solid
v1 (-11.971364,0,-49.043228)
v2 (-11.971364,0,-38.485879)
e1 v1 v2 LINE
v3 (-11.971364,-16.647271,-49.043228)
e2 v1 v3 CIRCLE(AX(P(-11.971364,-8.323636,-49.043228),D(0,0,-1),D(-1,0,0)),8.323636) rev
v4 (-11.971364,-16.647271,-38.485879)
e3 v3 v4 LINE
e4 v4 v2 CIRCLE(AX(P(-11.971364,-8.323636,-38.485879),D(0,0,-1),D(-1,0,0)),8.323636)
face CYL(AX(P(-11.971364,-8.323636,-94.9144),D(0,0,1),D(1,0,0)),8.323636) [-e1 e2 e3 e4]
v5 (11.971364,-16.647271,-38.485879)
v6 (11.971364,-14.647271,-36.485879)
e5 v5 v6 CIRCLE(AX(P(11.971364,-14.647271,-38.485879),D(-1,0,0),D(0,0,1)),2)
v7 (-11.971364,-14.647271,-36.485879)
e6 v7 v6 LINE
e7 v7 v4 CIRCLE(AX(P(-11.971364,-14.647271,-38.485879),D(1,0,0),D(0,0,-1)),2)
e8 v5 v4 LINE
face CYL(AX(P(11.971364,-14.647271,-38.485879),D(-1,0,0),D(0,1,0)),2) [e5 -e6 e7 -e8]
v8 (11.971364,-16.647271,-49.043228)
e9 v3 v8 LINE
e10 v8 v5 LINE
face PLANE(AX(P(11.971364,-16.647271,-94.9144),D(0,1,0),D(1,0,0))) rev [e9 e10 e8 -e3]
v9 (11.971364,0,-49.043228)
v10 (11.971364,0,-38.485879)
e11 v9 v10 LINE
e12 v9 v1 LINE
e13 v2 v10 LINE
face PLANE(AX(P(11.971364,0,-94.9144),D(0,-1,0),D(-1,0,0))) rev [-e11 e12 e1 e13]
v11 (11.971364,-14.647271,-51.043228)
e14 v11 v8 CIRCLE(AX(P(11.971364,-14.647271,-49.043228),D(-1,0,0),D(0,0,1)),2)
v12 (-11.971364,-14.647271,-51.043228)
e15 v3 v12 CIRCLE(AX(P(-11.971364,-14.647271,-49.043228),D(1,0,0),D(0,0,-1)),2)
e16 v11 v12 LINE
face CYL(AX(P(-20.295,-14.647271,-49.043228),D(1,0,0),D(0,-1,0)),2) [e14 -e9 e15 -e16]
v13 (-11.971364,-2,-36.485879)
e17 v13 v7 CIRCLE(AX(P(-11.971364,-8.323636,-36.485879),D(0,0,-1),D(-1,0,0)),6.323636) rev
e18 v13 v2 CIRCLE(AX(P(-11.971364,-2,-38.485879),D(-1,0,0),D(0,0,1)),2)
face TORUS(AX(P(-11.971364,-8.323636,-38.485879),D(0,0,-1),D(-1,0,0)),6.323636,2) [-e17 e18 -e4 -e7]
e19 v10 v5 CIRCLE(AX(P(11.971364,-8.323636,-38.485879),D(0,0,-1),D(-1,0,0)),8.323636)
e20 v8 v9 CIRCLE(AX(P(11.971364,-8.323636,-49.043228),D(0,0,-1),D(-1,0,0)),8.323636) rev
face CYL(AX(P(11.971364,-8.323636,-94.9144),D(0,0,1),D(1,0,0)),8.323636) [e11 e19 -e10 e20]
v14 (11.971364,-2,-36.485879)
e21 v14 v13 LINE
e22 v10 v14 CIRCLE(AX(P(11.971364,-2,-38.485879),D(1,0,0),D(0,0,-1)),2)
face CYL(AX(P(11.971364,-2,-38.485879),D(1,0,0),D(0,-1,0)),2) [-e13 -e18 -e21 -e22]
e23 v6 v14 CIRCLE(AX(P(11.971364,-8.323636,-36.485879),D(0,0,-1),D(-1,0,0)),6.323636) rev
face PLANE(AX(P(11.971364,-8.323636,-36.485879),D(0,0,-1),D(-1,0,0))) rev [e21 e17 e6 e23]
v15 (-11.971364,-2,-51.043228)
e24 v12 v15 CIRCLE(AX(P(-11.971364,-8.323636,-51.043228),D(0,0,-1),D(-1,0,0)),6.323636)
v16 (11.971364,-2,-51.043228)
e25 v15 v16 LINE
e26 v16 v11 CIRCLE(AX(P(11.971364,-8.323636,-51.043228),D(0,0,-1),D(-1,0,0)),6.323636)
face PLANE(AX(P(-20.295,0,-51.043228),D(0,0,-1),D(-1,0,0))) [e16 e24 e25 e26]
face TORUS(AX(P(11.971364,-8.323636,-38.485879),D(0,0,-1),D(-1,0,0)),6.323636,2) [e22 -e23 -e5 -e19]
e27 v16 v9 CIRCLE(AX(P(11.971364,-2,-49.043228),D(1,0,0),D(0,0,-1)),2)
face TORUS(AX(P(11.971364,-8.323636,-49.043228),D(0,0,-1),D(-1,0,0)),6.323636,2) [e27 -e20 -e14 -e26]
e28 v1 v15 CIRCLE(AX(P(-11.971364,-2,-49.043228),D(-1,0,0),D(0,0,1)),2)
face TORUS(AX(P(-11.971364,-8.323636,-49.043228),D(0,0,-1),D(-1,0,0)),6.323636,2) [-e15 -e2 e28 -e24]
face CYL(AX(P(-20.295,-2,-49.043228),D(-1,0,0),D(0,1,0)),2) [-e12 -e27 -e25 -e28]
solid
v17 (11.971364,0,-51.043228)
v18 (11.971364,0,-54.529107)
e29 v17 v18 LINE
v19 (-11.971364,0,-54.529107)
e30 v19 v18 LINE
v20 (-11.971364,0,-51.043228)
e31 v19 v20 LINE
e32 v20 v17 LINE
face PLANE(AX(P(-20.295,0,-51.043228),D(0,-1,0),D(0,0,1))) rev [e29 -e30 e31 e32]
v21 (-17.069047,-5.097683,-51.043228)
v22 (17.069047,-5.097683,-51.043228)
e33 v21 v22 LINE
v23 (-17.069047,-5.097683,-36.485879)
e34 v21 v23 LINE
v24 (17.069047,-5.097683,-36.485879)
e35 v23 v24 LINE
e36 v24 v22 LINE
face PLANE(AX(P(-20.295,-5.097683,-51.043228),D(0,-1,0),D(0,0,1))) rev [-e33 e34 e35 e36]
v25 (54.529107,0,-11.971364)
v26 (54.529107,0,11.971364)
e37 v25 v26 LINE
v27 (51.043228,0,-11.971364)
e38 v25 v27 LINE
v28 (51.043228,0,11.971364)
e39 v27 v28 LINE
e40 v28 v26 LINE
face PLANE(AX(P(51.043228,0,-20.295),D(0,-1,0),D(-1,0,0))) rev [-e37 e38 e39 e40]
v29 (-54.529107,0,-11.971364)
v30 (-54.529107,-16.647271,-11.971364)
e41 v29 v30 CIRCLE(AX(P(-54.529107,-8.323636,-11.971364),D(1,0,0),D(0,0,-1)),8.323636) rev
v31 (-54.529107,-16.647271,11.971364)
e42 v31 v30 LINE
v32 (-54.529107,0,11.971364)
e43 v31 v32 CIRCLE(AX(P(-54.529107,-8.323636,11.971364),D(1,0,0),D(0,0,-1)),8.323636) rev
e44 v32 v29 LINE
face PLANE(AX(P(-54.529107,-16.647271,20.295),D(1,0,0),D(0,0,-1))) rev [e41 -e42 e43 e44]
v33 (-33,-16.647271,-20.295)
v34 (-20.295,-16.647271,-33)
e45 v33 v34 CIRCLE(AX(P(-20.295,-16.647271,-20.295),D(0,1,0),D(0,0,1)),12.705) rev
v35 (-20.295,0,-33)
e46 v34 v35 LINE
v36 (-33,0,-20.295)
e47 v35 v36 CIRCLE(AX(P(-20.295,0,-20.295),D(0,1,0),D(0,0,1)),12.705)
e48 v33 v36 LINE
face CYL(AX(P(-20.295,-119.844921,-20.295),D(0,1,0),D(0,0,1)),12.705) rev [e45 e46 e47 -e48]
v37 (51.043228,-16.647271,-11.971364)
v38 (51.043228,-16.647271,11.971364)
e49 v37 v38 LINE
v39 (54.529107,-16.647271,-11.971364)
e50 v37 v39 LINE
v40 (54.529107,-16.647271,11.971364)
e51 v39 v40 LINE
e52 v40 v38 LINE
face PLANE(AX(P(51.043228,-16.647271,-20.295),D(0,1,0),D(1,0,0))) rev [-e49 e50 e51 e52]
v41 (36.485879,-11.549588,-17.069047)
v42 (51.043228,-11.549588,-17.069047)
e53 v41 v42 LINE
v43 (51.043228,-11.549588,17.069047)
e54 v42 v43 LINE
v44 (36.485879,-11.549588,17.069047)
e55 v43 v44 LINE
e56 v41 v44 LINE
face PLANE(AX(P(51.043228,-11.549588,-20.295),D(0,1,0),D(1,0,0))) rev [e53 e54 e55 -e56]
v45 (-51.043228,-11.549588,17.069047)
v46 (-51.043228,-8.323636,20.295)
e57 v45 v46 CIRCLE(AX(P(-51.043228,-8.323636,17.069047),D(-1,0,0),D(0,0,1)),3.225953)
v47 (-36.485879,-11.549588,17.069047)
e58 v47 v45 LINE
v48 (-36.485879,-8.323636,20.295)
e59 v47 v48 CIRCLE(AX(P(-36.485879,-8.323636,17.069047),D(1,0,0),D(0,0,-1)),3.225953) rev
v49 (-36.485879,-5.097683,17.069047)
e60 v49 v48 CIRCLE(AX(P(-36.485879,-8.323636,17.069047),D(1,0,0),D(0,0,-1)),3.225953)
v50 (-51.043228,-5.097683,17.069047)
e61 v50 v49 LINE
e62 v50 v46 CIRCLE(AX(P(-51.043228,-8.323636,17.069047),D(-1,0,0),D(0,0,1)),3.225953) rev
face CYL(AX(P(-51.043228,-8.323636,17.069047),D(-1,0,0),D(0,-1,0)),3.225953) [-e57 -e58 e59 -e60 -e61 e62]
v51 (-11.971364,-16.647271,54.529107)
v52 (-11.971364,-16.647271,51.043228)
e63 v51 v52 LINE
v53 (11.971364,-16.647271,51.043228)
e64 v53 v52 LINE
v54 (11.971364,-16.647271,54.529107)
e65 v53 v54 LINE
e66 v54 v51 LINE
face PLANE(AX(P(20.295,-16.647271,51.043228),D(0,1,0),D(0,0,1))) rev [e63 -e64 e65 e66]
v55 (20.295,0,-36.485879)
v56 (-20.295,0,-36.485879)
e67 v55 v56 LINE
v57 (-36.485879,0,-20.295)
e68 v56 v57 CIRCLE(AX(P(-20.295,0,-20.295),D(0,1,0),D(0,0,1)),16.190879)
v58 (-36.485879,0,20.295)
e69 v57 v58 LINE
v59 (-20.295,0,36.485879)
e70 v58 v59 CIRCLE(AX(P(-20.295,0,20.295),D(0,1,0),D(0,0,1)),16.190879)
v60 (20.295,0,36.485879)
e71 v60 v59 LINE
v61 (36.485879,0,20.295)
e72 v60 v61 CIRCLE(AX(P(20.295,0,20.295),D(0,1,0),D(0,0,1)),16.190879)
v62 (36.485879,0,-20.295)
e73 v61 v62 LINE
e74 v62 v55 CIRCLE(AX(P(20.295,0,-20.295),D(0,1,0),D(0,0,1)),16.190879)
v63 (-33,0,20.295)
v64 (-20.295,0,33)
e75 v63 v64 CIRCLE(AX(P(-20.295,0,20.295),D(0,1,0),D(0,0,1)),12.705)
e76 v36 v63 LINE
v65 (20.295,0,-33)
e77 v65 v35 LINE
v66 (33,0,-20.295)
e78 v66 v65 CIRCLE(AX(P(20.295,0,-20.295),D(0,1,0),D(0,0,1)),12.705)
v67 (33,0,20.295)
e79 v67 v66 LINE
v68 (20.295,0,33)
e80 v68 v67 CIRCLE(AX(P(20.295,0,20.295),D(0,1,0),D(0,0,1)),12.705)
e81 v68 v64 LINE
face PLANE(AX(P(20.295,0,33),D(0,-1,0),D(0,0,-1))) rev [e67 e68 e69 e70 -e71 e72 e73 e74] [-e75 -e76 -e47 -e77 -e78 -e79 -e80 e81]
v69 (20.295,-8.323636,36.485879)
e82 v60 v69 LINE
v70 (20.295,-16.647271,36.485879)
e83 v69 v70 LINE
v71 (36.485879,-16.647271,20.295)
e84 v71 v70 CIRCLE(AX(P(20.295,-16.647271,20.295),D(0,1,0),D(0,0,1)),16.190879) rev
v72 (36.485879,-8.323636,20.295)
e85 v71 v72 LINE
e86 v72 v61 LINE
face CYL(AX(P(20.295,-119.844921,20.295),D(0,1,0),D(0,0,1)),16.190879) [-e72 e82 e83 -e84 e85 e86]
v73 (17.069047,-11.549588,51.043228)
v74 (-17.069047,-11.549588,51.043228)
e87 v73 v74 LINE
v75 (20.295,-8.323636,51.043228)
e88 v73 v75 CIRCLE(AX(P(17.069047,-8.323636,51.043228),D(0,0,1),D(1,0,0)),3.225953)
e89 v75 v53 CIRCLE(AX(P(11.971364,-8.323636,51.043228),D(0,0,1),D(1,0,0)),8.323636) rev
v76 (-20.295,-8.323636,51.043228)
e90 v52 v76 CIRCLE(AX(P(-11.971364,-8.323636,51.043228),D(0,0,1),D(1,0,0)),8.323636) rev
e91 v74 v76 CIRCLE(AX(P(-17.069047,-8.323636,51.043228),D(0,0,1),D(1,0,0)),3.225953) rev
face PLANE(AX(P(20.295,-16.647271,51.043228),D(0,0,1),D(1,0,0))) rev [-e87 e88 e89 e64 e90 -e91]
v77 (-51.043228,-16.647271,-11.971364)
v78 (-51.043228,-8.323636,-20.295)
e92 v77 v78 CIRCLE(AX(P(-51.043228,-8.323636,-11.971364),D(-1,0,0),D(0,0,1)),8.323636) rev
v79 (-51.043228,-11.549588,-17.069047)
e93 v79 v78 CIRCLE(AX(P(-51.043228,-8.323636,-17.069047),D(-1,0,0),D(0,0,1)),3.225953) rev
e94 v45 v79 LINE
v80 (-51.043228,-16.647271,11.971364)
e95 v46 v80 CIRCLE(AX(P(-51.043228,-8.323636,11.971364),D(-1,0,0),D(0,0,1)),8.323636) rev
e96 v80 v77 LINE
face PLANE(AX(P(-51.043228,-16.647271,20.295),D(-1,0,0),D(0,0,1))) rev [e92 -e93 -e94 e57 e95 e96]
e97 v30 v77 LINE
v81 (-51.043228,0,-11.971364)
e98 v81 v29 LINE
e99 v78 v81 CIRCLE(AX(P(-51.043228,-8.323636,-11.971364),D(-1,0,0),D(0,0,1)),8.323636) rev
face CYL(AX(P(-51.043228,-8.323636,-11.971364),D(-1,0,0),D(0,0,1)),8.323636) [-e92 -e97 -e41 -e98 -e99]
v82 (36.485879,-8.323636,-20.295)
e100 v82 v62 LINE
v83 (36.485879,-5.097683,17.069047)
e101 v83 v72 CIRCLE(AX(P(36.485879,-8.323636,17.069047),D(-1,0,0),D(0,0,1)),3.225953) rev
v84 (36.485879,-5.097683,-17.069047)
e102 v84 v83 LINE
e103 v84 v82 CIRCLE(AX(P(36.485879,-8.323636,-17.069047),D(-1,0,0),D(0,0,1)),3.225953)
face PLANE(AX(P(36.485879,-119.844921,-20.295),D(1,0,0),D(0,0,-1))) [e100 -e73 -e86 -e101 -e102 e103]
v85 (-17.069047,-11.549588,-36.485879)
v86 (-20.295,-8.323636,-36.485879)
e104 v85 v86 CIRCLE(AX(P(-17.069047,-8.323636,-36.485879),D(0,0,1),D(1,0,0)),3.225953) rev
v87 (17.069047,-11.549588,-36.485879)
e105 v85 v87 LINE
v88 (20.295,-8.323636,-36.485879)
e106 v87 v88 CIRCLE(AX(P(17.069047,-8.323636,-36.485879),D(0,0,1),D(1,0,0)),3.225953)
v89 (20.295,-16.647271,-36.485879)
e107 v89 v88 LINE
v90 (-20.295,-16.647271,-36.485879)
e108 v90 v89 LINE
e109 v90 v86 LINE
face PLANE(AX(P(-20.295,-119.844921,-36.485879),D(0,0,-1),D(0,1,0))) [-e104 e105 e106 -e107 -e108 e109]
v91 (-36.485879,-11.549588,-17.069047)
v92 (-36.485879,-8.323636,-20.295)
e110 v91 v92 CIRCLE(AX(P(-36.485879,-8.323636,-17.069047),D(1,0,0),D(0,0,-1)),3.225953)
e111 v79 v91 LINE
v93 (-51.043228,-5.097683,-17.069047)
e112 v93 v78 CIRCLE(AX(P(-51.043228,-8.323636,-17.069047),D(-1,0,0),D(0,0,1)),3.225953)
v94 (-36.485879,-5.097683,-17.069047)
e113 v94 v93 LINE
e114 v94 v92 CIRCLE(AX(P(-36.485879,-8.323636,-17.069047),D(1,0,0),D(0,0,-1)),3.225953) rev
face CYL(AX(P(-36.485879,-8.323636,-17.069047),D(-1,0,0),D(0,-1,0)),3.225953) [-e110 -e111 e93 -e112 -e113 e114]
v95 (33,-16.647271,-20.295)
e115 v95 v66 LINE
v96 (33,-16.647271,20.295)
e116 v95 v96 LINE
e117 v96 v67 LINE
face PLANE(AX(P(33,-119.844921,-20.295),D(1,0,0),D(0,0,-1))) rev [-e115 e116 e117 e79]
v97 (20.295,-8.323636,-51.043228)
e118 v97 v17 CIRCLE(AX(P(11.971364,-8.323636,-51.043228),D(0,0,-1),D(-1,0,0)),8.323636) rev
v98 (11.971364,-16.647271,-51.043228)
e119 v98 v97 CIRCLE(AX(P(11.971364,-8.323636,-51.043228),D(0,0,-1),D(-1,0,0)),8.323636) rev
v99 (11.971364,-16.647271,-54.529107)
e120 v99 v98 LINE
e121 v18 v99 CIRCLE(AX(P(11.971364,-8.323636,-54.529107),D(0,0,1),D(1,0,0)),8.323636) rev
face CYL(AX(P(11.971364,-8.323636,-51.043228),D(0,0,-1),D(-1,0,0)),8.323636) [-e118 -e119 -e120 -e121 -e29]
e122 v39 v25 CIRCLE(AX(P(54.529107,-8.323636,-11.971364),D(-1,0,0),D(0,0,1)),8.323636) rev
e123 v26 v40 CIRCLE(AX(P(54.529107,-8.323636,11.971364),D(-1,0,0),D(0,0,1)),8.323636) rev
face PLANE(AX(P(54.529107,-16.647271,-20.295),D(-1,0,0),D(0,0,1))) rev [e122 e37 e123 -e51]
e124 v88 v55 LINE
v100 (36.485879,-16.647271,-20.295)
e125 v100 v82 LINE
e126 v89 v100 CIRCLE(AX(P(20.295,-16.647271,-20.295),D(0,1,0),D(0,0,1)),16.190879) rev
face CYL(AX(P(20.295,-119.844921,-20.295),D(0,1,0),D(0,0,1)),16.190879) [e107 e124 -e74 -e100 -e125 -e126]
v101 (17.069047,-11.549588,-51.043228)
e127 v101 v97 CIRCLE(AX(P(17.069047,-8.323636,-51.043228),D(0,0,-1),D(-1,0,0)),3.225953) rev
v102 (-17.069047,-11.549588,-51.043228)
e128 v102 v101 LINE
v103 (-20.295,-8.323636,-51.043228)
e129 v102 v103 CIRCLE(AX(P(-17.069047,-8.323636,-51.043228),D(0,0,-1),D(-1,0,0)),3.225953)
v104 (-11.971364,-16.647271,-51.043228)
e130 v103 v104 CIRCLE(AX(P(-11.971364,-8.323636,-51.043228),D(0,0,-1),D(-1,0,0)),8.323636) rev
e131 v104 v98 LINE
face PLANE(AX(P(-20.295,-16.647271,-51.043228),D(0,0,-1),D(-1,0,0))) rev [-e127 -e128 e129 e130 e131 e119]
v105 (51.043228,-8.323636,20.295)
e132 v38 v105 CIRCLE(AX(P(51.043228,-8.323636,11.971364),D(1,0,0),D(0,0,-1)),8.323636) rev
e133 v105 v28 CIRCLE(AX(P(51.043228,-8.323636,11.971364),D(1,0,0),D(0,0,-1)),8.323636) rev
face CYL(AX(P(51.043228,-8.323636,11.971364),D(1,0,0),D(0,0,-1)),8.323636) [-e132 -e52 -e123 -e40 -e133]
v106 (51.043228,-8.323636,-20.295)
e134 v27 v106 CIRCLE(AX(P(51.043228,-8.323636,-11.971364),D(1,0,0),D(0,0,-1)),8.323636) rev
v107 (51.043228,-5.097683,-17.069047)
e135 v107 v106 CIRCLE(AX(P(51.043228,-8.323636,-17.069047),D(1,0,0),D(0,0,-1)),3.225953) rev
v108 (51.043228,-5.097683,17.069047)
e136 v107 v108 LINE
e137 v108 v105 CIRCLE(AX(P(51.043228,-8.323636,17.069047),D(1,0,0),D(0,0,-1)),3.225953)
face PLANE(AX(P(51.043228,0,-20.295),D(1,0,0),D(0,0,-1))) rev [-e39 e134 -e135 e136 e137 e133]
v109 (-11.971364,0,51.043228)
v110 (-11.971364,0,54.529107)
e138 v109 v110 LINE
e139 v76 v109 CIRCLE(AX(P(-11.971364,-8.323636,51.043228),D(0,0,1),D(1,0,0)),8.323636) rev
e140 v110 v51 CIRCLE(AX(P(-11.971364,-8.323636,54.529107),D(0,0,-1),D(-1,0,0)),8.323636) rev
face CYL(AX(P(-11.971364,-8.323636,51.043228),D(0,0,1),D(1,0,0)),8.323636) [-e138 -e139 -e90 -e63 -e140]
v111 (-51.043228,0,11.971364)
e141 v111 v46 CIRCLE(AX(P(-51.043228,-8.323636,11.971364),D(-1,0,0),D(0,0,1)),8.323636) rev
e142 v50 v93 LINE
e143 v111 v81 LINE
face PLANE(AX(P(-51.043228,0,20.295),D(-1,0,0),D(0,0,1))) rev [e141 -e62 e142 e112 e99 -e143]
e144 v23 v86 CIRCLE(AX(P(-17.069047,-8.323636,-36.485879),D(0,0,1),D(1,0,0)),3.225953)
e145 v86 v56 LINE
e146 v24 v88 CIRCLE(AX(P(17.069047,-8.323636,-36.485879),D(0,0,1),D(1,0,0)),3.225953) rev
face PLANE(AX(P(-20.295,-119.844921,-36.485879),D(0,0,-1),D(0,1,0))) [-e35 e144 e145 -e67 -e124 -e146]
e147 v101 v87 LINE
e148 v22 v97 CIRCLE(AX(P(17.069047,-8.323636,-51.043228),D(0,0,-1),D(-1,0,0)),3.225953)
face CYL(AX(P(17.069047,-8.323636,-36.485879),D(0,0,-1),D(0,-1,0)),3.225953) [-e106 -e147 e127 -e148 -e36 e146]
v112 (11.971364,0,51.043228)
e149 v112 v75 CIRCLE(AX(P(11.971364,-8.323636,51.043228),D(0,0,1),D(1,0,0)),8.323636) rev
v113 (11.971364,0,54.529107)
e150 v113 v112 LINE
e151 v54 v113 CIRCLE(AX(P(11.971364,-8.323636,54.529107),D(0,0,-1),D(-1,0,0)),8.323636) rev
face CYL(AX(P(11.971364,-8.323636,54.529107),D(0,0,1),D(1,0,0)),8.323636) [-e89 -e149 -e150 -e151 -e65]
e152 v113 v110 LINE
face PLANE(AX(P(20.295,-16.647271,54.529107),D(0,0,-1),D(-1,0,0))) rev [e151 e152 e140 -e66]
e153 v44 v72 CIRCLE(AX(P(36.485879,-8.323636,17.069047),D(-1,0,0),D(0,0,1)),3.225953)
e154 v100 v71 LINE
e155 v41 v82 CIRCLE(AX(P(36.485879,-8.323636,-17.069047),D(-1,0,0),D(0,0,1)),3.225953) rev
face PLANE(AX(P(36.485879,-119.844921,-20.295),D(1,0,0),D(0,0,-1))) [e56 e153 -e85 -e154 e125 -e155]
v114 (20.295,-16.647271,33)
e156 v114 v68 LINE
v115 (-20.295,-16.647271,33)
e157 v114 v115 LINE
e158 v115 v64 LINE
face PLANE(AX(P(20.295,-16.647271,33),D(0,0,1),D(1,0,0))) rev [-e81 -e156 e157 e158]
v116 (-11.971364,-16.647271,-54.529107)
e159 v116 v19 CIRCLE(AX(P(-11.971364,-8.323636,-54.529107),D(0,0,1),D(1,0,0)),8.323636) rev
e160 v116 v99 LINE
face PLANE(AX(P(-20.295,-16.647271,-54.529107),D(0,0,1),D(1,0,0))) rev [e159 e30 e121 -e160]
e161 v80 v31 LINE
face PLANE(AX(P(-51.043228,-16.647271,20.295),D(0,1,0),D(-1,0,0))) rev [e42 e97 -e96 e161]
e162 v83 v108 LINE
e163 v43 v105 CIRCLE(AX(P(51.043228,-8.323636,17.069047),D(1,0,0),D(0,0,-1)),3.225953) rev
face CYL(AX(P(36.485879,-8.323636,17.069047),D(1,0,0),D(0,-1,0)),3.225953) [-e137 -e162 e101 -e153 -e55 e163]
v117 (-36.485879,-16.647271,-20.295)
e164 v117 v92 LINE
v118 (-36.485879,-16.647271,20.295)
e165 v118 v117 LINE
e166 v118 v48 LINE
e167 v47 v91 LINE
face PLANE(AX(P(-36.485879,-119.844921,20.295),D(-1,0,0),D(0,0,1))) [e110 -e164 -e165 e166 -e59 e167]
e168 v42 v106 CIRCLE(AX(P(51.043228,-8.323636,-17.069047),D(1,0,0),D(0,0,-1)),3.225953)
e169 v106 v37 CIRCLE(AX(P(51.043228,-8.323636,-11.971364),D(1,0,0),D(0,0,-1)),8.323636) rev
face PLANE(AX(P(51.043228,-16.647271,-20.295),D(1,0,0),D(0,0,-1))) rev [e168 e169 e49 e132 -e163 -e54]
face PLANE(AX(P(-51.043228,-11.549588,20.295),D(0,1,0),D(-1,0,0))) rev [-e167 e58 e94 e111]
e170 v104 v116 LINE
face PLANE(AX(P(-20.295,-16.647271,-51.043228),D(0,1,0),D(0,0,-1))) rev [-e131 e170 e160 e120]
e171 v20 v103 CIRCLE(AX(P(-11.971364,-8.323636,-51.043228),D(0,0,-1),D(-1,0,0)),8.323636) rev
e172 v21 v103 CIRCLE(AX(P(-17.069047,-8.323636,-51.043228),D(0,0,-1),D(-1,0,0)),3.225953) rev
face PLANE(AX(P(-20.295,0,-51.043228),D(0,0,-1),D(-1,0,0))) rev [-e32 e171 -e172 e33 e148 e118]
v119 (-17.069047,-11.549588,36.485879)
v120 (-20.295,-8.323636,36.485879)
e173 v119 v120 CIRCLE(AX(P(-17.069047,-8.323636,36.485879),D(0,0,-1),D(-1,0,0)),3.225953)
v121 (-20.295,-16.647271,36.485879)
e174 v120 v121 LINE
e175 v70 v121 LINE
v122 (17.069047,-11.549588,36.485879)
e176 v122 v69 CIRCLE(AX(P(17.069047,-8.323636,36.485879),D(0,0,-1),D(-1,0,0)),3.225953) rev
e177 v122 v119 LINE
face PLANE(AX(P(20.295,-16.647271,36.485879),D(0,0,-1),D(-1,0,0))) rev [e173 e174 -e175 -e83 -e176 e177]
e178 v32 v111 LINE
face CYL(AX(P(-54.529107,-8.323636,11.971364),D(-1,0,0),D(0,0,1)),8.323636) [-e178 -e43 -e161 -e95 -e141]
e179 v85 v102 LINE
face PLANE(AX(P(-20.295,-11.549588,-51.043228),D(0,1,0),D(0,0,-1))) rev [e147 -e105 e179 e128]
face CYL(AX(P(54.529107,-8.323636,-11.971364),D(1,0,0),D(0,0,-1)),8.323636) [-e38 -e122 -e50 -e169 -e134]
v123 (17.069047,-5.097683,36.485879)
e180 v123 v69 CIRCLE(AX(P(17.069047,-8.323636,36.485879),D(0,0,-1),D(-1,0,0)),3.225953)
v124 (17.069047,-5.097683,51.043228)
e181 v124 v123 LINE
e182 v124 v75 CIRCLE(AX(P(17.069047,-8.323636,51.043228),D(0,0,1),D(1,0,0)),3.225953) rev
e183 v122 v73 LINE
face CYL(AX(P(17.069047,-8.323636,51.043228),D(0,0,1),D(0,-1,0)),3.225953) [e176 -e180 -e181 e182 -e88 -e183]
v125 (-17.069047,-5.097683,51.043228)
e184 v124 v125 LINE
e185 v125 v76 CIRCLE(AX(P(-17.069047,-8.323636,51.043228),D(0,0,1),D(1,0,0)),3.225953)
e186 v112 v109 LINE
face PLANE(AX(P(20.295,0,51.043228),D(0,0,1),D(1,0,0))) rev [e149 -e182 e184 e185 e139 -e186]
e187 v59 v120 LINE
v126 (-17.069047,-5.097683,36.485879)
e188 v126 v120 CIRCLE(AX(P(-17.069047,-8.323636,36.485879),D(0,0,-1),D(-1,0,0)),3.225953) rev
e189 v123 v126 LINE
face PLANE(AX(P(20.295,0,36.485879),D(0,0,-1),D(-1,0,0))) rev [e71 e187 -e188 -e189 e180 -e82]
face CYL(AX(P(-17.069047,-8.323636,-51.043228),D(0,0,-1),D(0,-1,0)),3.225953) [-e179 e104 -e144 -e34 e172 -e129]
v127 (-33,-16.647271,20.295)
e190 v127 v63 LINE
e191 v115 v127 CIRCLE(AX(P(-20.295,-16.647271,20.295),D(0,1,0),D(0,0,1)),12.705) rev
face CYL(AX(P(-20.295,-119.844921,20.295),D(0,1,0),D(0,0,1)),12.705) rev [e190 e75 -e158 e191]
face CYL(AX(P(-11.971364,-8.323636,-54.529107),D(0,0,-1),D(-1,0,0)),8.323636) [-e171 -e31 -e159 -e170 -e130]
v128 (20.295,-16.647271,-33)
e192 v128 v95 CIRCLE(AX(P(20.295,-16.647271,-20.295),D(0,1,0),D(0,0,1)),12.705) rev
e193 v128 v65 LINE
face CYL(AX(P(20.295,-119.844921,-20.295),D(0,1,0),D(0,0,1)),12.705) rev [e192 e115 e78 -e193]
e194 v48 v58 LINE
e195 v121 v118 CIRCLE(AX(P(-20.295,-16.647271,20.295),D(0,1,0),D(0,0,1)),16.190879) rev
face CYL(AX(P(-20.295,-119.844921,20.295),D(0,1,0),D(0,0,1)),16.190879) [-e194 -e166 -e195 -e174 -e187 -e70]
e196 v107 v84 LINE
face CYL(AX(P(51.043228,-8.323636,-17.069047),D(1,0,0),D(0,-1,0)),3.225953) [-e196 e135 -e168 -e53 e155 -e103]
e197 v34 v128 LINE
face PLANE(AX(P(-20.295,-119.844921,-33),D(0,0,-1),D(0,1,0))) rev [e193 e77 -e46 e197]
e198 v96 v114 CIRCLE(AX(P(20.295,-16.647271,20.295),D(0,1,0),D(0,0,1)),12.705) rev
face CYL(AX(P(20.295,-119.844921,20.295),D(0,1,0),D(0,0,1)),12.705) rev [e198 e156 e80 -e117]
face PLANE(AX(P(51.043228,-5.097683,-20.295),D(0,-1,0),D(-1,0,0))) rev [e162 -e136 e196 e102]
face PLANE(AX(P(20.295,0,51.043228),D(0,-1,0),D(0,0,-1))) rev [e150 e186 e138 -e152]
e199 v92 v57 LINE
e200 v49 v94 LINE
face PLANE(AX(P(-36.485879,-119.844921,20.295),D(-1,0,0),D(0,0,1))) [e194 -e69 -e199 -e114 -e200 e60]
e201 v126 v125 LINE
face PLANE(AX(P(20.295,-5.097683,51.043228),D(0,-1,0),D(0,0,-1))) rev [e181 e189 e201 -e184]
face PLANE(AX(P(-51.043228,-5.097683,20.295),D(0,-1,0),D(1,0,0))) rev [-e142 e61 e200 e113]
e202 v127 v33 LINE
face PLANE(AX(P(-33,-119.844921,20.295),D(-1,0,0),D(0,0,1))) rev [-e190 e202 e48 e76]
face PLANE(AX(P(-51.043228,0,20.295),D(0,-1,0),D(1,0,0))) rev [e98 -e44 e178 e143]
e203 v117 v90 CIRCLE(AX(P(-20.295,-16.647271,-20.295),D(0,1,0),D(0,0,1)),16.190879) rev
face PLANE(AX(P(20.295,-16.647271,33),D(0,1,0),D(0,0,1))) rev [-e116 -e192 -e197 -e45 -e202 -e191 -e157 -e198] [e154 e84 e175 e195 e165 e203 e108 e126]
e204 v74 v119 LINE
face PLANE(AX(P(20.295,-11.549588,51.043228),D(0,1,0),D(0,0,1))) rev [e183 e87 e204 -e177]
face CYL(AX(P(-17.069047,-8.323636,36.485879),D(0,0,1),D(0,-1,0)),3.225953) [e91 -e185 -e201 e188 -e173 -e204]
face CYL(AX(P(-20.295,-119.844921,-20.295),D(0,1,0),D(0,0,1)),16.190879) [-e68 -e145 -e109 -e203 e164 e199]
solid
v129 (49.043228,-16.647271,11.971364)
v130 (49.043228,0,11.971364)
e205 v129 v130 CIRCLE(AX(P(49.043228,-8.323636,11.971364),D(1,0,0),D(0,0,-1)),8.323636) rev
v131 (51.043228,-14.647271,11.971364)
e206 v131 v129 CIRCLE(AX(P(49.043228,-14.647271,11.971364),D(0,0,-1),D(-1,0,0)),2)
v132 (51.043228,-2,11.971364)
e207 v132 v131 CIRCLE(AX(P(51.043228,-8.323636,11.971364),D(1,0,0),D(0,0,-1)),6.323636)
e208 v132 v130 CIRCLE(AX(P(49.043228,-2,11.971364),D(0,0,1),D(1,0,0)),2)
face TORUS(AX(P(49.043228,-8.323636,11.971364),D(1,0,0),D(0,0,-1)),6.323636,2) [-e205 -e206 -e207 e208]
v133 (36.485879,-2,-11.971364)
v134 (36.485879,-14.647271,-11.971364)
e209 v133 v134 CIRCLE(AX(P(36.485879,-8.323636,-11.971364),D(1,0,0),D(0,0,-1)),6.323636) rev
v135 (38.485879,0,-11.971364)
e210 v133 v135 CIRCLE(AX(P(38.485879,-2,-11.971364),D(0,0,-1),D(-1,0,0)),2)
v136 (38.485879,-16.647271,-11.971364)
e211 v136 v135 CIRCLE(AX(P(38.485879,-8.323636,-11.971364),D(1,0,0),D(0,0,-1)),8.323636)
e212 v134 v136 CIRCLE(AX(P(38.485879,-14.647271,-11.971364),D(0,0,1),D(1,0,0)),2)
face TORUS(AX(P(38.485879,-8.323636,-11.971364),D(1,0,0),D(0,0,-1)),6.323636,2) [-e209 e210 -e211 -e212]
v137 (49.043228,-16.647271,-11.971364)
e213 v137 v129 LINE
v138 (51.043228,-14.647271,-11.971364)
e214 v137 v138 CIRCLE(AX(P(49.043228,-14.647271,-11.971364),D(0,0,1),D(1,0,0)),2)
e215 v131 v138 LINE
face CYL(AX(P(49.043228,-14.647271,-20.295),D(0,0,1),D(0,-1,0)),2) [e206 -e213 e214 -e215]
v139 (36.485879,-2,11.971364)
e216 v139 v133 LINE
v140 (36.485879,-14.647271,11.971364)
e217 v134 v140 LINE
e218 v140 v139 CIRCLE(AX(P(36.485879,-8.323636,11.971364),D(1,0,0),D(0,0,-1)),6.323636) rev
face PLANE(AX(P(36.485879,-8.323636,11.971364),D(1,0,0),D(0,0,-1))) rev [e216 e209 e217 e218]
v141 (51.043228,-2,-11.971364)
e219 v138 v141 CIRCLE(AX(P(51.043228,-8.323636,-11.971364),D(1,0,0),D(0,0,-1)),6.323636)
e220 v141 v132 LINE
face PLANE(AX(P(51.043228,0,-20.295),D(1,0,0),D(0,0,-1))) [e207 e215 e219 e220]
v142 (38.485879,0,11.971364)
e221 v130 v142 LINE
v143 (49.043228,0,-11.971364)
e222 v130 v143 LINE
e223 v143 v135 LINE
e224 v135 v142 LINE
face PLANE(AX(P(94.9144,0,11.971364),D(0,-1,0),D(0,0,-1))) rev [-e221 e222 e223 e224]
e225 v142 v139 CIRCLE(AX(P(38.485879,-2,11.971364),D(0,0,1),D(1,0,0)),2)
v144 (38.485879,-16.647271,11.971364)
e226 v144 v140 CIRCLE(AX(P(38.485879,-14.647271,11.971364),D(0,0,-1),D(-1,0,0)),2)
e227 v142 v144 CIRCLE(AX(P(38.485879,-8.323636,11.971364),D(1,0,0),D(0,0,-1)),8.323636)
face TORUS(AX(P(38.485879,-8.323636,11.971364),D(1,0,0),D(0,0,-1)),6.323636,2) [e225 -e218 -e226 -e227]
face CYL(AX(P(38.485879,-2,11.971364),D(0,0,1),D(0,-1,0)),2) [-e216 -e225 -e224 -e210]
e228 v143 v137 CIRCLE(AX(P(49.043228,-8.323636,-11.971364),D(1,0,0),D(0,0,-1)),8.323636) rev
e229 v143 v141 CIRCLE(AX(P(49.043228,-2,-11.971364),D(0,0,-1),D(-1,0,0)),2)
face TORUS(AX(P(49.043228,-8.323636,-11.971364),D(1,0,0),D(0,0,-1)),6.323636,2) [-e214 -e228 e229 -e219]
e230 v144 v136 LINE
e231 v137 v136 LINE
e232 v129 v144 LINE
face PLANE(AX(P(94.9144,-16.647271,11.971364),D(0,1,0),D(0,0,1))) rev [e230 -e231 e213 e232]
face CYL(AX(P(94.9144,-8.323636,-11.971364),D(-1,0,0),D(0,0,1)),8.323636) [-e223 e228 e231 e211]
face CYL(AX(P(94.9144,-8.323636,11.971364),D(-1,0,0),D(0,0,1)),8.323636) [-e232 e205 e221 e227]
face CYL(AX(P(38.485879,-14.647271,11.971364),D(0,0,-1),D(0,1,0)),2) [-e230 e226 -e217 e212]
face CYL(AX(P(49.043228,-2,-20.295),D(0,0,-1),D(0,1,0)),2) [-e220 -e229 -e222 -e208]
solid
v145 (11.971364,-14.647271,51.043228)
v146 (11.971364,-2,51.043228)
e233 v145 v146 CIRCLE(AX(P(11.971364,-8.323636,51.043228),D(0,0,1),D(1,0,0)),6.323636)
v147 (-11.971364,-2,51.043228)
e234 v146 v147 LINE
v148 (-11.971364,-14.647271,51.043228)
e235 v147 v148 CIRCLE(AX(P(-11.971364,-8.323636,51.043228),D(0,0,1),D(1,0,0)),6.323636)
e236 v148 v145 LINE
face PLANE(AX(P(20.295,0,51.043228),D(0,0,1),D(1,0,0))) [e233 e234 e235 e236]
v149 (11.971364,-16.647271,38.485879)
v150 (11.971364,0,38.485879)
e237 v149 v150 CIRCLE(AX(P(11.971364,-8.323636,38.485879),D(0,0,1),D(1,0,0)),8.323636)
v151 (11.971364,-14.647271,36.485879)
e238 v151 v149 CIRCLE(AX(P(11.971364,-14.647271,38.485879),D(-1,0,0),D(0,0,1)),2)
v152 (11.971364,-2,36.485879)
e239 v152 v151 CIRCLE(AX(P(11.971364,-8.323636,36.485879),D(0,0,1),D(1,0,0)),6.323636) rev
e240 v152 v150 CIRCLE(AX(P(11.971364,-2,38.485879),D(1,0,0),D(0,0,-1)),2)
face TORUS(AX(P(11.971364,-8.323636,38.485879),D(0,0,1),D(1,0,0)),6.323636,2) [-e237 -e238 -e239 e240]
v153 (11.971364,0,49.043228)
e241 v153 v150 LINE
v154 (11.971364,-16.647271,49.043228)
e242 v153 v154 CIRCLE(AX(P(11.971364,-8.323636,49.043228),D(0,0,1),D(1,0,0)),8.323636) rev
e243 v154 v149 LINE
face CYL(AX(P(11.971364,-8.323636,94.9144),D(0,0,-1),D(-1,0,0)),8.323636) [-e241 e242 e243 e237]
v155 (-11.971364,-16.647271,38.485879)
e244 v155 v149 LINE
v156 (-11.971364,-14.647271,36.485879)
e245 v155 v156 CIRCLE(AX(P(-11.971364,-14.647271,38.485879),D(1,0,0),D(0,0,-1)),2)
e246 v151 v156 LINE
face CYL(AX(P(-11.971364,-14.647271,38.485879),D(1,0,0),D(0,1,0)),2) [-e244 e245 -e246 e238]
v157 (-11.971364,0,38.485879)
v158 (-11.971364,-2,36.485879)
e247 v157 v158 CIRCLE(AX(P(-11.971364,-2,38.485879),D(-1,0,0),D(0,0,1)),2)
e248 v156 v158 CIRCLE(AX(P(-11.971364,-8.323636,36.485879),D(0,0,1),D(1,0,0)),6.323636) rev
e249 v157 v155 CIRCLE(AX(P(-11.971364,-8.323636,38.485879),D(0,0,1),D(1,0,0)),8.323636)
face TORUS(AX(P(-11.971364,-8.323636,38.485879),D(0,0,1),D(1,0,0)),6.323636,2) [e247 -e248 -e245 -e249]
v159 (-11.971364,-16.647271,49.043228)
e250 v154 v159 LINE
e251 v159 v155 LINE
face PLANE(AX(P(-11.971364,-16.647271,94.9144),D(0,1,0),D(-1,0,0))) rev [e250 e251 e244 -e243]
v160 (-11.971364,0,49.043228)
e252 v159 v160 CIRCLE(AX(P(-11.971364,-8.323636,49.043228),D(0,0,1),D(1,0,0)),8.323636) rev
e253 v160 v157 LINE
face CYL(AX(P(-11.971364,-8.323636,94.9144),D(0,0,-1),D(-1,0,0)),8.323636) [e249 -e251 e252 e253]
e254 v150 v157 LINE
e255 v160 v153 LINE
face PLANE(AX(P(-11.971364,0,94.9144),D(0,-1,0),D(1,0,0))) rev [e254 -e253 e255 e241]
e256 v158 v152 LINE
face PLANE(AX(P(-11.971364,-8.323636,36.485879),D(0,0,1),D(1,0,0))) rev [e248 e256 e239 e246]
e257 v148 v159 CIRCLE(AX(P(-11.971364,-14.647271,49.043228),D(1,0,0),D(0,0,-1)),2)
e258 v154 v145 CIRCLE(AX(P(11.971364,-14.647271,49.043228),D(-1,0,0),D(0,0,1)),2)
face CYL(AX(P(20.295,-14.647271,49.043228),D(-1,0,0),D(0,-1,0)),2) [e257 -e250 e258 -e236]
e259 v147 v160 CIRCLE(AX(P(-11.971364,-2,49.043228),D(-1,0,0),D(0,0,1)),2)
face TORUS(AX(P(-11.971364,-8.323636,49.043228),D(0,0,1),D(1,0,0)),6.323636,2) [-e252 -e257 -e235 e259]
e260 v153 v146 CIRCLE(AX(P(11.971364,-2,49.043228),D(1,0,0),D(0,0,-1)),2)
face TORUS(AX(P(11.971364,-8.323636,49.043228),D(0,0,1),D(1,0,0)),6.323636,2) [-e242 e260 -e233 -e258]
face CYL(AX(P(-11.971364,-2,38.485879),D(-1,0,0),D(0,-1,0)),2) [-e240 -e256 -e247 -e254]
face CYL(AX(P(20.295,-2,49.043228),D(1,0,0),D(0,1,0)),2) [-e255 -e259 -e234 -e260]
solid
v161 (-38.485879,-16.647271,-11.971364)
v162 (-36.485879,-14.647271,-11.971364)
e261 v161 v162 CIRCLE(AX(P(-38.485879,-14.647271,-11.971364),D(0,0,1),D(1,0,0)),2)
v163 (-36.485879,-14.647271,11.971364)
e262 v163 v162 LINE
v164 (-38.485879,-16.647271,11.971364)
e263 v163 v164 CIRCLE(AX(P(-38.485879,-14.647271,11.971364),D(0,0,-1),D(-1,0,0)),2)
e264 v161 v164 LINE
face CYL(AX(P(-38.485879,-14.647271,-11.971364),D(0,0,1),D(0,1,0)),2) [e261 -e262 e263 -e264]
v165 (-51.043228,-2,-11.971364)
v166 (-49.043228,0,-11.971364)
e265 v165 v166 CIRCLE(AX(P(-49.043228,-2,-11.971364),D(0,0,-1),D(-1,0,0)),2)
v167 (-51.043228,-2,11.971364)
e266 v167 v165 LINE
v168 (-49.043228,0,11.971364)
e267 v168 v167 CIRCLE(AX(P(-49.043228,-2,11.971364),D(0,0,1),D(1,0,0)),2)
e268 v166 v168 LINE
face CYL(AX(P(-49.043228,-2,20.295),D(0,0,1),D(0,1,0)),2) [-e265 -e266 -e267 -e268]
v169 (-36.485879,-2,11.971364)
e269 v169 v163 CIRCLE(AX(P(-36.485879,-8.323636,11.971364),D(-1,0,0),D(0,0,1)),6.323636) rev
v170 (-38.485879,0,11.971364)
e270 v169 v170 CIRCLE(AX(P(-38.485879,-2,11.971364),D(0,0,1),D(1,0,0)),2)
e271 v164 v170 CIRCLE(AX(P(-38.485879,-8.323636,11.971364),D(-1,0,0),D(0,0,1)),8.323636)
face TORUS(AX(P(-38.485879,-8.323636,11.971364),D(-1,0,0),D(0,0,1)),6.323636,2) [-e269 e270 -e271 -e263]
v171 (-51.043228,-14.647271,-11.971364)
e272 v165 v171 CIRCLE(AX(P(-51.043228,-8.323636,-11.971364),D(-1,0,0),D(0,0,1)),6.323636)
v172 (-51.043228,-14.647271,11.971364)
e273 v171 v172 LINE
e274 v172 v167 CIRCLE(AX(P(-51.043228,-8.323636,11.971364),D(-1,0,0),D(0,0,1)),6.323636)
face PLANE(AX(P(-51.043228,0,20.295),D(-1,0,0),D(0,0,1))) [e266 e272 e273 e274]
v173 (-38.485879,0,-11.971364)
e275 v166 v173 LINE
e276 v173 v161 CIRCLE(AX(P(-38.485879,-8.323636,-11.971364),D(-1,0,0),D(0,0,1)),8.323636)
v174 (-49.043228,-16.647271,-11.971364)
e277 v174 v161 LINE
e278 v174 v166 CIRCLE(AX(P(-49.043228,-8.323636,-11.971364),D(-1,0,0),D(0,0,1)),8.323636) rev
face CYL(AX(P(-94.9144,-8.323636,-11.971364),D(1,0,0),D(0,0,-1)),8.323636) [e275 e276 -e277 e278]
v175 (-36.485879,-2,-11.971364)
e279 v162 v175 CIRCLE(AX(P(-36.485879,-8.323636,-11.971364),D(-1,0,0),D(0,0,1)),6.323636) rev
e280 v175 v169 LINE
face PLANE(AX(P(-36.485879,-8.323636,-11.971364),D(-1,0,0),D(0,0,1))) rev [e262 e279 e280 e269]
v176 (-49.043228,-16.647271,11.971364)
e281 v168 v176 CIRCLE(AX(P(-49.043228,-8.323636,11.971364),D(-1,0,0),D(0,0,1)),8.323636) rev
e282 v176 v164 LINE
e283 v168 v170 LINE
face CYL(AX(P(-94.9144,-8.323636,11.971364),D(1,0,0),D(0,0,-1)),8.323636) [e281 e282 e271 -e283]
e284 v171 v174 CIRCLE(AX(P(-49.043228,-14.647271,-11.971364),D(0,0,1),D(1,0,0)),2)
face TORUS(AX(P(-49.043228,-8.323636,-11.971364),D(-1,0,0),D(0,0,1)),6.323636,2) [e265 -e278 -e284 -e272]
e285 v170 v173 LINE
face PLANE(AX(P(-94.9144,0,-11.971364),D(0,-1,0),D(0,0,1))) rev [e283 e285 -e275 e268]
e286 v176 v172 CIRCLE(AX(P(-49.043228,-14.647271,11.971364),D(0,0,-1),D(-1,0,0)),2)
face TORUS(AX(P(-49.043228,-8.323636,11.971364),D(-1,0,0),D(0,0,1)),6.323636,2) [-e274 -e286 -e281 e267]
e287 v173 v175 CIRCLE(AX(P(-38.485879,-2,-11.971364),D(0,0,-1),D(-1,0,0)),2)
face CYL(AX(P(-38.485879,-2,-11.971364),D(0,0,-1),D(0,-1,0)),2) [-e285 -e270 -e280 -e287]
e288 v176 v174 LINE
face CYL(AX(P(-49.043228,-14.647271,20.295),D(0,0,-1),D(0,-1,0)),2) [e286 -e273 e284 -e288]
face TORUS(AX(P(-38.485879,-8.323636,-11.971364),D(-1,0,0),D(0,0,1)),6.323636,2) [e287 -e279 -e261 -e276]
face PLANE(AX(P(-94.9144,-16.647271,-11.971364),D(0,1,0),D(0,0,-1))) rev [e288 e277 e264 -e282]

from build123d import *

# Parameters (mm, degrees)
BOSS_EXTRUDE3_DEPTH = 20.295
FILLET1_R           = 3.225953
FILLET2_R           = 3.225953
FILLET5_RADIUS      = 8.323635735
FILLET5_LENGTH      = 3.485878963
FILLET6_RADIUS      = 8.323635735
FILLET6_LENGTH      = 3.485878963
CIRPATTERN3_COUNT   = 4
BOSS_EXTRUDE4_START = -16.647271
BOSS_EXTRUDE4_DEPTH = 16.647271
BOSS_EXTRUDE5_DEPTH = 14.557348703
FILLET3_R           = 2
CIRPATTERN5_COUNT   = 4


with BuildPart() as part:
    # Sketch4 → Boss-Extrude3 (new, symmetric)
    with BuildSketch(Plane(origin=(0, 0, 0), x_dir=(0, 0, -1), z_dir=(1, 0, 0))):
        Polygon((-51.043227666, 0), (-54.529106628, 0), (-54.529106628, -16.64727147), (-51.043227666, -16.64727147), (-51.043227666, -11.549588473), (-36.485878963, -11.549588473), (-36.485878963, -16.64727147), (-33, -16.64727147), (-33, 0), (-36.485878963, 0), (-36.485878963, -5.097682997), (-51.043227666, -5.097682997), align=None)
    extrude(amount=BOSS_EXTRUDE3_DEPTH, both=True)

    # Fillet1
    fillet1_edges = [part.edges().sort_by_distance(p)[0] for p in [
        (20.295, -11.549588473, 43.764553314),
        (20.295, -5.097682997, 43.764553314),
    ]]
    fillet(fillet1_edges, radius=FILLET1_R - 0.0001)  # a hair under: the kernel refuses the full size

    # Fillet2
    fillet2_edges = [part.edges().sort_by_distance(p)[0] for p in [
        (-20.295, -5.097682997, 43.764553314),
        (-20.295, -11.549588473, 43.764553314),
    ]]
    fillet(fillet2_edges, radius=FILLET2_R - 0.0001)  # a hair under: the kernel refuses the full size

    # Fillet5: full round fillet: the end face becomes a half cylinder, R = half its width
    fillet5_face = Plane((20.295, -8.323635735, 52.786167147), x_dir=(0, 0, 1), z_dir=(1, 0, 0))  # on the end face: x along it, z out of the body
    fillet5_slab = fillet5_face.offset(-FILLET5_RADIUS / 2) * Box(FILLET5_LENGTH, 2 * FILLET5_RADIUS, FILLET5_RADIUS, mode=Mode.PRIVATE)  # the body's end, R deep
    fillet5_round = Plane((11.971364265, -8.323635735, 52.786167147), x_dir=(1, 0, 0), z_dir=(0, 0, 1)) * Cylinder(FILLET5_RADIUS, FILLET5_LENGTH, mode=Mode.PRIVATE)  # its axis R under the face
    add(fillet5_slab - fillet5_round, mode=Mode.SUBTRACT)

    # Fillet6: full round fillet: the end face becomes a half cylinder, R = half its width
    fillet6_face = Plane((-20.295, -8.323635735, 52.786167147), x_dir=(0, 0, -1), z_dir=(-1, 0, 0))  # on the end face: x along it, z out of the body
    fillet6_slab = fillet6_face.offset(-FILLET6_RADIUS / 2) * Box(FILLET6_LENGTH, 2 * FILLET6_RADIUS, FILLET6_RADIUS, mode=Mode.PRIVATE)  # the body's end, R deep
    fillet6_round = Plane((-11.971364265, -8.323635735, 52.786167147), x_dir=(-1, 0, 0), z_dir=(0, 0, -1)) * Cylinder(FILLET6_RADIUS, FILLET6_LENGTH, mode=Mode.PRIVATE)  # its axis R under the face
    add(fillet6_slab - fillet6_round, mode=Mode.SUBTRACT)


with BuildPart() as cirpattern3_1:
    # CirPattern3: pattern copy
    add(part.part.rotate(Axis((0, 0, 0), (0, 1, 0)), 1 * 360 / CIRPATTERN3_COUNT))


with BuildPart() as cirpattern3_2:
    # CirPattern3: pattern copy
    add(part.part.rotate(Axis((0, 0, 0), (0, 1, 0)), 2 * 360 / CIRPATTERN3_COUNT))


with BuildPart() as cirpattern3_3:
    # CirPattern3: pattern copy
    add(part.part.rotate(Axis((0, 0, 0), (0, 1, 0)), 3 * 360 / CIRPATTERN3_COUNT))


with BuildPart() as part_1:
    add(part.part)

    add(cirpattern3_1.part)  # Boss-Extrude4 merges CirPattern3_1

    add(cirpattern3_2.part)  # Boss-Extrude4 merges CirPattern3_2

    add(cirpattern3_3.part)  # Boss-Extrude4 merges CirPattern3_3
    # Sketch7 → Boss-Extrude4 (add)
    with BuildSketch(Plane(origin=(0, 0, 0), x_dir=(1, 0, 0), z_dir=(0, 1, 0)).offset(BOSS_EXTRUDE4_START)):
        with BuildLine():
            Line((-20.295, 36.485878963), (20.295, 36.485878963))
            ThreePointArc((20.295, 36.485878963), (31.743680308, 31.743680308), (36.485878963, 20.295))
            Line((36.485878963, 20.295), (36.485878963, -20.295))
            ThreePointArc((36.485878963, -20.295), (31.743680308, -31.743680308), (20.295, -36.485878963))
            Line((20.295, -36.485878963), (-20.295, -36.485878963))
            ThreePointArc((-20.295, -36.485878963), (-31.743680308, -31.743680308), (-36.485878963, -20.295))
            Line((-36.485878963, -20.295), (-36.485878963, 20.295))
            ThreePointArc((-36.485878963, 20.295), (-31.743680308, 31.743680308), (-20.295, 36.485878963))
        make_face()
        with BuildLine():
            Line((-20.295, 33), (20.295, 33))
            ThreePointArc((20.295, 33), (29.278791655, 29.278791655), (33, 20.295))
            Line((33, 20.295), (33, -20.295))
            ThreePointArc((33, -20.295), (29.278791655, -29.278791655), (20.295, -33))
            Line((20.295, -33), (-20.295, -33))
            ThreePointArc((-20.295, -33), (-29.278791655, -29.278791655), (-33, -20.295))
            Line((-33, -20.295), (-33, 20.295))
            ThreePointArc((-33, 20.295), (-29.278791655, 29.278791655), (-20.295, 33))
        make_face(mode=Mode.SUBTRACT)
    extrude(amount=BOSS_EXTRUDE4_DEPTH)


with BuildPart() as body_2:
    # Sketch9 → Boss-Extrude5 (new body)
    with BuildSketch(Plane.XY.offset(36.485878963)):
        with BuildLine():
            Line((-11.971364265, 0), (11.971364265, 0))
            ThreePointArc((11.971364265, 0), (20.295, -8.323635735), (11.971364265, -16.64727147))
            Line((11.971364265, -16.64727147), (-11.971364265, -16.64727147))
            ThreePointArc((-11.971364265, -16.64727147), (-20.295, -8.323635735), (-11.971364265, 0))
        make_face()
    extrude(amount=BOSS_EXTRUDE5_DEPTH)

    # Fillet3
    fillet3_edges = [body_2.edges().sort_by_distance(p)[0] for p in [
        (0, -16.64727147, 36.485878963),
        (20.295, -8.323635735, 36.485878963),
        (0, 0, 36.485878963),
        (0, 0, 51.043227666),
        (-20.295, -8.323635735, 51.043227666),
        (0, -16.64727147, 51.043227666),
        (20.295, -8.323635735, 51.043227666),
        (-20.295, -8.323635735, 36.485878963),
    ]]
    fillet(fillet3_edges, radius=FILLET3_R)


with BuildPart() as cirpattern5_1:
    # CirPattern5: pattern copy
    add(body_2.part.rotate(Axis((0, 0, 0), (0, 1, 0)), 1 * 360 / CIRPATTERN5_COUNT))


with BuildPart() as cirpattern5_2:
    # CirPattern5: pattern copy
    add(body_2.part.rotate(Axis((0, 0, 0), (0, 1, 0)), 2 * 360 / CIRPATTERN5_COUNT))


with BuildPart() as cirpattern5_3:
    # CirPattern5: pattern copy
    add(body_2.part.rotate(Axis((0, 0, 0), (0, 1, 0)), 3 * 360 / CIRPATTERN5_COUNT))


solid = Compound([part_1.part, body_2.part, cirpattern5_1.part, cirpattern5_2.part, cirpattern5_3.part])
